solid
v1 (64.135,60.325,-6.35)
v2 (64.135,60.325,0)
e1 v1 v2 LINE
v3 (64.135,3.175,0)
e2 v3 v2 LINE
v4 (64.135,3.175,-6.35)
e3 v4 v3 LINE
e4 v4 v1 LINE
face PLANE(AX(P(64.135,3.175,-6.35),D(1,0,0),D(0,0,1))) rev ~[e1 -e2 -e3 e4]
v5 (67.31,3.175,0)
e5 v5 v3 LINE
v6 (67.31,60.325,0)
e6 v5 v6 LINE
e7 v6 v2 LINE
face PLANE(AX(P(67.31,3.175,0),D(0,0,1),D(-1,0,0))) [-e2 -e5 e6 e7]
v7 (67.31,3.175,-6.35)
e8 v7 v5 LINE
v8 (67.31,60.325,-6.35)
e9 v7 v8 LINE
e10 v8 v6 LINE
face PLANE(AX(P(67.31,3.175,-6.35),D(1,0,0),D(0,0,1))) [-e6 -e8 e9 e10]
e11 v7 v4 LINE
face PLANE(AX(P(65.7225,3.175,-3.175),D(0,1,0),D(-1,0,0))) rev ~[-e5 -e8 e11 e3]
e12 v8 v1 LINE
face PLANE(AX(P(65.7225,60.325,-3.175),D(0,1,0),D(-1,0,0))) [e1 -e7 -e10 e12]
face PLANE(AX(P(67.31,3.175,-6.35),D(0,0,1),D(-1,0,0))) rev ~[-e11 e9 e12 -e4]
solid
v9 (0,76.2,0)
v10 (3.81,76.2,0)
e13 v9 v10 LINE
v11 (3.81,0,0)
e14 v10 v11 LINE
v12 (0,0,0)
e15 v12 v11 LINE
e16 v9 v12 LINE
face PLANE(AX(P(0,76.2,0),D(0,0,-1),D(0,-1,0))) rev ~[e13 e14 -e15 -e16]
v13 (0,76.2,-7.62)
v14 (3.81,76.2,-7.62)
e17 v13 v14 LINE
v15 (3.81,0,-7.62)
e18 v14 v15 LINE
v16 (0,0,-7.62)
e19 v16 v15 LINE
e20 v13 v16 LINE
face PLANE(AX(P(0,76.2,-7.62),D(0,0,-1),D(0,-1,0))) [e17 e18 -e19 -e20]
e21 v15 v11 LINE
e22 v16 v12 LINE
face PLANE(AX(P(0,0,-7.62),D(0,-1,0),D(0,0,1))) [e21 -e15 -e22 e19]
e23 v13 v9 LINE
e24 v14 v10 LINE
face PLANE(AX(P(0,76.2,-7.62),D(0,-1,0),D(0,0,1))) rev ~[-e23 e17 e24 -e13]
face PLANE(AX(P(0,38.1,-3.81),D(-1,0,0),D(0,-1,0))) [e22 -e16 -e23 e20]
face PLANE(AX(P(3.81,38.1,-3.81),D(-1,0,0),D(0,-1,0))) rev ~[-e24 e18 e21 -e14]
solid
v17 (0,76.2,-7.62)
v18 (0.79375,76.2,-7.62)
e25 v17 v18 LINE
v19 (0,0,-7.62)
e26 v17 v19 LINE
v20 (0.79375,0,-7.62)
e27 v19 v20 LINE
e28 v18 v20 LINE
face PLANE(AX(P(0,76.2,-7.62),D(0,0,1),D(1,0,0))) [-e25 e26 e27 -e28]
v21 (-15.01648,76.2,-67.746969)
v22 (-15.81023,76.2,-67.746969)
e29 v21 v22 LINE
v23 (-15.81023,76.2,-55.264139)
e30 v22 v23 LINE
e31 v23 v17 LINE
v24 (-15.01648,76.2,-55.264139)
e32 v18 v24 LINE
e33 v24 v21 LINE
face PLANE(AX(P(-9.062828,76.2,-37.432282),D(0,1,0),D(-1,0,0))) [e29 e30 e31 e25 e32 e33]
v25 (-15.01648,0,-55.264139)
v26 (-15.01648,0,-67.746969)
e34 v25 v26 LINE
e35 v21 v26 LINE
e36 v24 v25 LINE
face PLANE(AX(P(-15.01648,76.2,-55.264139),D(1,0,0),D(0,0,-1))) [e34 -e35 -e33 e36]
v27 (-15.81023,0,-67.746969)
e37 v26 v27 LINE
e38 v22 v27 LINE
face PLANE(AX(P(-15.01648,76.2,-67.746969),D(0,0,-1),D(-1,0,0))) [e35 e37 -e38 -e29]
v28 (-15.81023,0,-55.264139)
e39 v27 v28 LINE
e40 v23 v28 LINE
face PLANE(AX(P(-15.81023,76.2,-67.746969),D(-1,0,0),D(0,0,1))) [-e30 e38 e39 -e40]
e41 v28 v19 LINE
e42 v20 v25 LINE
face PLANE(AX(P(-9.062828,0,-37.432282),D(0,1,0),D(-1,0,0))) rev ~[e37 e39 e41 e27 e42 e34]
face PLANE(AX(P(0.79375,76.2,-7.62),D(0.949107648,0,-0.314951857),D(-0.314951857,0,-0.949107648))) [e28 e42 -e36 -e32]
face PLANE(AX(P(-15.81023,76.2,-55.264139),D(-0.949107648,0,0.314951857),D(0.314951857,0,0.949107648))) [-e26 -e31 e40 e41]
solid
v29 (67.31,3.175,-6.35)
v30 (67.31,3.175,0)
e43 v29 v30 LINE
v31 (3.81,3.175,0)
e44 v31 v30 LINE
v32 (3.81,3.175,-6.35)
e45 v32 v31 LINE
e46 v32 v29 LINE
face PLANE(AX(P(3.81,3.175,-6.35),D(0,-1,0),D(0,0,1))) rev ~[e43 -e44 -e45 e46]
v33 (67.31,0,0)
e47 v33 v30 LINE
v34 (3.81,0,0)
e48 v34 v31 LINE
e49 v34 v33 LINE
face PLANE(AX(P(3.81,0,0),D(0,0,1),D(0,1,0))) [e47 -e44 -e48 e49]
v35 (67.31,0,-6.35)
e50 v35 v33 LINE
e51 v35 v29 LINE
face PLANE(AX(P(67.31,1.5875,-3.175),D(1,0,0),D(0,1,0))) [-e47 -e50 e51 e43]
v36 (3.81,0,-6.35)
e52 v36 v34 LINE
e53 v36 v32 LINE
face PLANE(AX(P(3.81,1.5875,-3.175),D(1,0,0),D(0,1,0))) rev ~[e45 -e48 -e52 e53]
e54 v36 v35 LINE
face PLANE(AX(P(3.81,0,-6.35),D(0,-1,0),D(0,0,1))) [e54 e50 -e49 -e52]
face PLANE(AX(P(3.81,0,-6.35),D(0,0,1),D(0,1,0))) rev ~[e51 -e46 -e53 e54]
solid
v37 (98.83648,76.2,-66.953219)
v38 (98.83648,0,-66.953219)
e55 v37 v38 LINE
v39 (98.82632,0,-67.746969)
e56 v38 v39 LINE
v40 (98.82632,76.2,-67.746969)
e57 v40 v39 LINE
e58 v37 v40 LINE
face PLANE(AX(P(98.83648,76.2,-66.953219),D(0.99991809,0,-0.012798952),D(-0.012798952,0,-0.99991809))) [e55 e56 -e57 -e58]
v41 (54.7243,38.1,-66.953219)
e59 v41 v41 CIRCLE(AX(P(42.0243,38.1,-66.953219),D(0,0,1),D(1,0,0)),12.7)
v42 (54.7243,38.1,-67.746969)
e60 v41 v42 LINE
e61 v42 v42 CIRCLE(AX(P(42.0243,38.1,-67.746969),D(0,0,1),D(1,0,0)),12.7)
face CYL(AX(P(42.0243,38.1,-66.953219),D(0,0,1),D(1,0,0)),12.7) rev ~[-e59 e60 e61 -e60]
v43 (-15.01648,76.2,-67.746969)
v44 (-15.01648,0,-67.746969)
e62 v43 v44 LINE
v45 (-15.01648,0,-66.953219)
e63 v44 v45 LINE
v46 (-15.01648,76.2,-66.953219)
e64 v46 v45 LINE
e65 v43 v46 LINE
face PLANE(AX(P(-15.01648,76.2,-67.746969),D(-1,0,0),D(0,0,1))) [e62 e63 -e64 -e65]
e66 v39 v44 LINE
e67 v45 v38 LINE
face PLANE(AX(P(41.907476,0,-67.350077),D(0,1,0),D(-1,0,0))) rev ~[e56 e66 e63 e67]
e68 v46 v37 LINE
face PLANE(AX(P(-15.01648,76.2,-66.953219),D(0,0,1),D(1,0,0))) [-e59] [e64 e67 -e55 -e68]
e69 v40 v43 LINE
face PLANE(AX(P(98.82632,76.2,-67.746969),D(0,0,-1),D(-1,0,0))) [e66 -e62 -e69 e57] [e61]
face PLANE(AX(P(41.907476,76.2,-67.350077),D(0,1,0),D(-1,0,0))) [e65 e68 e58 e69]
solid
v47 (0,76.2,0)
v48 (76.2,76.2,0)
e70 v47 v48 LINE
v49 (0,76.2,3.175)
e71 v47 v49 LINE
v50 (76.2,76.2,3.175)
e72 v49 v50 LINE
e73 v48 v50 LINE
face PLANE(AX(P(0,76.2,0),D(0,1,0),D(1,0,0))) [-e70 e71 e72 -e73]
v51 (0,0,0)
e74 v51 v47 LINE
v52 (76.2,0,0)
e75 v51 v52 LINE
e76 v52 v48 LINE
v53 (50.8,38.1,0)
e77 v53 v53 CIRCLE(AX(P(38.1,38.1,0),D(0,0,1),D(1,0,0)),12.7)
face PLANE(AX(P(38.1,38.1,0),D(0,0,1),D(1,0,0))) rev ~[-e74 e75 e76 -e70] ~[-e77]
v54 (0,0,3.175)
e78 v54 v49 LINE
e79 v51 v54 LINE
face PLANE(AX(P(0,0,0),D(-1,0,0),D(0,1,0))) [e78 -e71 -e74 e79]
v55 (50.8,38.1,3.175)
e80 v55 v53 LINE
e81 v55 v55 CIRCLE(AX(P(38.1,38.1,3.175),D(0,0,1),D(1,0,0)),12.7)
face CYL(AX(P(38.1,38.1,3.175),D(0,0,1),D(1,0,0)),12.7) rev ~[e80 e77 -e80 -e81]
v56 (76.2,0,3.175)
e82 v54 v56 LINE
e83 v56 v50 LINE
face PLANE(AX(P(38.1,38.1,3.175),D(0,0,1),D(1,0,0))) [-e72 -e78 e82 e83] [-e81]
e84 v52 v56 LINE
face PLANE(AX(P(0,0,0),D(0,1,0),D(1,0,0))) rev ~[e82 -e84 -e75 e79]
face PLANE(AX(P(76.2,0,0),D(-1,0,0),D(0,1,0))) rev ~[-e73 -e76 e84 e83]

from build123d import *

# Parameters (mm, degrees)
F0_W      = 76.2
F0_H      = 76.2
F1_DEPTH  = 3.175
F2_R      = 12.7
F3_DEPTH  = 3.176
F4_W      = 76.2
F4_H      = 7.62
F5_DEPTH  = 3.81
F7_W      = 3.175
F7_H      = 6.35
F8_DEPTH  = 63.5
F12_DEPTH = 76.2
F13_DEPTH = 76.2
F14_R     = 12.7
F15_DEPTH = 0.79475
F16_W     = 3.175
F16_H     = 6.35
F17_DEPTH = 57.15


# Not quite as in the source:
# - a feature names something its author has since deleted; it is built from what else it names


with BuildPart() as f1:
    # F0 (on Top) → F1 (new body)
    with BuildSketch(Plane.XY):
        with Locations((38.1, 38.1)):
            Rectangle(F0_W, F0_H)
    extrude(amount=F1_DEPTH)

    # F2 (on face) → F3 (cut, through all)
    with BuildSketch(Plane.XY.offset(3.175)):
        with Locations((38.1, 38.1)):
            Circle(F2_R)
    extrude(amount=-F3_DEPTH, mode=Mode.SUBTRACT)


with BuildPart() as f5:
    # F4 (on face) → F5 (new body)
    with BuildSketch(Plane(origin=(0, 0, 0), x_dir=(0, -1, 0), z_dir=(-1, 0, 0))):
        with Locations((-38.1, -3.81)):
            Rectangle(F4_W, F4_H)
    extrude(amount=-F5_DEPTH)


with BuildPart() as f8:
    # F7 (on face) → F8 (new body)
    with BuildSketch(Plane.YZ.offset(3.81)):
        with Locations((1.5875, -3.175)):
            Rectangle(F7_W, F7_H)
    extrude(amount=F8_DEPTH)


with BuildPart() as f12:
    # F11 (on face) → F12 (new body)
    with BuildSketch(Plane(origin=(0, 76.2, 0), x_dir=(-1, 0, 0), z_dir=(0, 1, 0))):
        Polygon((15.81023, -55.2641394734), (0, -7.62), (-0.79375, -7.62), (15.01648, -55.2641394734), (15.01648, -66.9532194734), (15.01648, -67.7469694734), (15.81023, -67.7469694734), align=None)
    extrude(amount=-F12_DEPTH)


with BuildPart() as f13:
    # F11 (on face) → F13 (new body)
    with BuildSketch(Plane(origin=(0, 76.2, 0), x_dir=(-1, 0, 0), z_dir=(0, 1, 0))):
        Polygon((15.01648, -67.7469694734), (15.01648, -66.9532194734), (-98.83648, -66.9532194734), (-98.82632, -67.7469694734), align=None)
    extrude(amount=-F13_DEPTH)

    # F14 (on face) → F15 (cut, through all)
    with BuildSketch(Plane.XY.offset(-66.9532194734)):
        with Locations((42.0243, 38.1)):
            Circle(F14_R)
    extrude(amount=-F15_DEPTH, mode=Mode.SUBTRACT)


with BuildPart() as f17:
    # F16 (on face) → F17 (new body)
    with BuildSketch(Plane(origin=(0, 3.175, 0), x_dir=(-1, 0, 0), z_dir=(0, 1, 0))):
        with Locations((-65.7225, -3.175)):
            Rectangle(F16_W, F16_H)
    extrude(amount=F17_DEPTH)


solid = Compound([f1.part, f5.part, f8.part, f12.part, f13.part, f17.part])
